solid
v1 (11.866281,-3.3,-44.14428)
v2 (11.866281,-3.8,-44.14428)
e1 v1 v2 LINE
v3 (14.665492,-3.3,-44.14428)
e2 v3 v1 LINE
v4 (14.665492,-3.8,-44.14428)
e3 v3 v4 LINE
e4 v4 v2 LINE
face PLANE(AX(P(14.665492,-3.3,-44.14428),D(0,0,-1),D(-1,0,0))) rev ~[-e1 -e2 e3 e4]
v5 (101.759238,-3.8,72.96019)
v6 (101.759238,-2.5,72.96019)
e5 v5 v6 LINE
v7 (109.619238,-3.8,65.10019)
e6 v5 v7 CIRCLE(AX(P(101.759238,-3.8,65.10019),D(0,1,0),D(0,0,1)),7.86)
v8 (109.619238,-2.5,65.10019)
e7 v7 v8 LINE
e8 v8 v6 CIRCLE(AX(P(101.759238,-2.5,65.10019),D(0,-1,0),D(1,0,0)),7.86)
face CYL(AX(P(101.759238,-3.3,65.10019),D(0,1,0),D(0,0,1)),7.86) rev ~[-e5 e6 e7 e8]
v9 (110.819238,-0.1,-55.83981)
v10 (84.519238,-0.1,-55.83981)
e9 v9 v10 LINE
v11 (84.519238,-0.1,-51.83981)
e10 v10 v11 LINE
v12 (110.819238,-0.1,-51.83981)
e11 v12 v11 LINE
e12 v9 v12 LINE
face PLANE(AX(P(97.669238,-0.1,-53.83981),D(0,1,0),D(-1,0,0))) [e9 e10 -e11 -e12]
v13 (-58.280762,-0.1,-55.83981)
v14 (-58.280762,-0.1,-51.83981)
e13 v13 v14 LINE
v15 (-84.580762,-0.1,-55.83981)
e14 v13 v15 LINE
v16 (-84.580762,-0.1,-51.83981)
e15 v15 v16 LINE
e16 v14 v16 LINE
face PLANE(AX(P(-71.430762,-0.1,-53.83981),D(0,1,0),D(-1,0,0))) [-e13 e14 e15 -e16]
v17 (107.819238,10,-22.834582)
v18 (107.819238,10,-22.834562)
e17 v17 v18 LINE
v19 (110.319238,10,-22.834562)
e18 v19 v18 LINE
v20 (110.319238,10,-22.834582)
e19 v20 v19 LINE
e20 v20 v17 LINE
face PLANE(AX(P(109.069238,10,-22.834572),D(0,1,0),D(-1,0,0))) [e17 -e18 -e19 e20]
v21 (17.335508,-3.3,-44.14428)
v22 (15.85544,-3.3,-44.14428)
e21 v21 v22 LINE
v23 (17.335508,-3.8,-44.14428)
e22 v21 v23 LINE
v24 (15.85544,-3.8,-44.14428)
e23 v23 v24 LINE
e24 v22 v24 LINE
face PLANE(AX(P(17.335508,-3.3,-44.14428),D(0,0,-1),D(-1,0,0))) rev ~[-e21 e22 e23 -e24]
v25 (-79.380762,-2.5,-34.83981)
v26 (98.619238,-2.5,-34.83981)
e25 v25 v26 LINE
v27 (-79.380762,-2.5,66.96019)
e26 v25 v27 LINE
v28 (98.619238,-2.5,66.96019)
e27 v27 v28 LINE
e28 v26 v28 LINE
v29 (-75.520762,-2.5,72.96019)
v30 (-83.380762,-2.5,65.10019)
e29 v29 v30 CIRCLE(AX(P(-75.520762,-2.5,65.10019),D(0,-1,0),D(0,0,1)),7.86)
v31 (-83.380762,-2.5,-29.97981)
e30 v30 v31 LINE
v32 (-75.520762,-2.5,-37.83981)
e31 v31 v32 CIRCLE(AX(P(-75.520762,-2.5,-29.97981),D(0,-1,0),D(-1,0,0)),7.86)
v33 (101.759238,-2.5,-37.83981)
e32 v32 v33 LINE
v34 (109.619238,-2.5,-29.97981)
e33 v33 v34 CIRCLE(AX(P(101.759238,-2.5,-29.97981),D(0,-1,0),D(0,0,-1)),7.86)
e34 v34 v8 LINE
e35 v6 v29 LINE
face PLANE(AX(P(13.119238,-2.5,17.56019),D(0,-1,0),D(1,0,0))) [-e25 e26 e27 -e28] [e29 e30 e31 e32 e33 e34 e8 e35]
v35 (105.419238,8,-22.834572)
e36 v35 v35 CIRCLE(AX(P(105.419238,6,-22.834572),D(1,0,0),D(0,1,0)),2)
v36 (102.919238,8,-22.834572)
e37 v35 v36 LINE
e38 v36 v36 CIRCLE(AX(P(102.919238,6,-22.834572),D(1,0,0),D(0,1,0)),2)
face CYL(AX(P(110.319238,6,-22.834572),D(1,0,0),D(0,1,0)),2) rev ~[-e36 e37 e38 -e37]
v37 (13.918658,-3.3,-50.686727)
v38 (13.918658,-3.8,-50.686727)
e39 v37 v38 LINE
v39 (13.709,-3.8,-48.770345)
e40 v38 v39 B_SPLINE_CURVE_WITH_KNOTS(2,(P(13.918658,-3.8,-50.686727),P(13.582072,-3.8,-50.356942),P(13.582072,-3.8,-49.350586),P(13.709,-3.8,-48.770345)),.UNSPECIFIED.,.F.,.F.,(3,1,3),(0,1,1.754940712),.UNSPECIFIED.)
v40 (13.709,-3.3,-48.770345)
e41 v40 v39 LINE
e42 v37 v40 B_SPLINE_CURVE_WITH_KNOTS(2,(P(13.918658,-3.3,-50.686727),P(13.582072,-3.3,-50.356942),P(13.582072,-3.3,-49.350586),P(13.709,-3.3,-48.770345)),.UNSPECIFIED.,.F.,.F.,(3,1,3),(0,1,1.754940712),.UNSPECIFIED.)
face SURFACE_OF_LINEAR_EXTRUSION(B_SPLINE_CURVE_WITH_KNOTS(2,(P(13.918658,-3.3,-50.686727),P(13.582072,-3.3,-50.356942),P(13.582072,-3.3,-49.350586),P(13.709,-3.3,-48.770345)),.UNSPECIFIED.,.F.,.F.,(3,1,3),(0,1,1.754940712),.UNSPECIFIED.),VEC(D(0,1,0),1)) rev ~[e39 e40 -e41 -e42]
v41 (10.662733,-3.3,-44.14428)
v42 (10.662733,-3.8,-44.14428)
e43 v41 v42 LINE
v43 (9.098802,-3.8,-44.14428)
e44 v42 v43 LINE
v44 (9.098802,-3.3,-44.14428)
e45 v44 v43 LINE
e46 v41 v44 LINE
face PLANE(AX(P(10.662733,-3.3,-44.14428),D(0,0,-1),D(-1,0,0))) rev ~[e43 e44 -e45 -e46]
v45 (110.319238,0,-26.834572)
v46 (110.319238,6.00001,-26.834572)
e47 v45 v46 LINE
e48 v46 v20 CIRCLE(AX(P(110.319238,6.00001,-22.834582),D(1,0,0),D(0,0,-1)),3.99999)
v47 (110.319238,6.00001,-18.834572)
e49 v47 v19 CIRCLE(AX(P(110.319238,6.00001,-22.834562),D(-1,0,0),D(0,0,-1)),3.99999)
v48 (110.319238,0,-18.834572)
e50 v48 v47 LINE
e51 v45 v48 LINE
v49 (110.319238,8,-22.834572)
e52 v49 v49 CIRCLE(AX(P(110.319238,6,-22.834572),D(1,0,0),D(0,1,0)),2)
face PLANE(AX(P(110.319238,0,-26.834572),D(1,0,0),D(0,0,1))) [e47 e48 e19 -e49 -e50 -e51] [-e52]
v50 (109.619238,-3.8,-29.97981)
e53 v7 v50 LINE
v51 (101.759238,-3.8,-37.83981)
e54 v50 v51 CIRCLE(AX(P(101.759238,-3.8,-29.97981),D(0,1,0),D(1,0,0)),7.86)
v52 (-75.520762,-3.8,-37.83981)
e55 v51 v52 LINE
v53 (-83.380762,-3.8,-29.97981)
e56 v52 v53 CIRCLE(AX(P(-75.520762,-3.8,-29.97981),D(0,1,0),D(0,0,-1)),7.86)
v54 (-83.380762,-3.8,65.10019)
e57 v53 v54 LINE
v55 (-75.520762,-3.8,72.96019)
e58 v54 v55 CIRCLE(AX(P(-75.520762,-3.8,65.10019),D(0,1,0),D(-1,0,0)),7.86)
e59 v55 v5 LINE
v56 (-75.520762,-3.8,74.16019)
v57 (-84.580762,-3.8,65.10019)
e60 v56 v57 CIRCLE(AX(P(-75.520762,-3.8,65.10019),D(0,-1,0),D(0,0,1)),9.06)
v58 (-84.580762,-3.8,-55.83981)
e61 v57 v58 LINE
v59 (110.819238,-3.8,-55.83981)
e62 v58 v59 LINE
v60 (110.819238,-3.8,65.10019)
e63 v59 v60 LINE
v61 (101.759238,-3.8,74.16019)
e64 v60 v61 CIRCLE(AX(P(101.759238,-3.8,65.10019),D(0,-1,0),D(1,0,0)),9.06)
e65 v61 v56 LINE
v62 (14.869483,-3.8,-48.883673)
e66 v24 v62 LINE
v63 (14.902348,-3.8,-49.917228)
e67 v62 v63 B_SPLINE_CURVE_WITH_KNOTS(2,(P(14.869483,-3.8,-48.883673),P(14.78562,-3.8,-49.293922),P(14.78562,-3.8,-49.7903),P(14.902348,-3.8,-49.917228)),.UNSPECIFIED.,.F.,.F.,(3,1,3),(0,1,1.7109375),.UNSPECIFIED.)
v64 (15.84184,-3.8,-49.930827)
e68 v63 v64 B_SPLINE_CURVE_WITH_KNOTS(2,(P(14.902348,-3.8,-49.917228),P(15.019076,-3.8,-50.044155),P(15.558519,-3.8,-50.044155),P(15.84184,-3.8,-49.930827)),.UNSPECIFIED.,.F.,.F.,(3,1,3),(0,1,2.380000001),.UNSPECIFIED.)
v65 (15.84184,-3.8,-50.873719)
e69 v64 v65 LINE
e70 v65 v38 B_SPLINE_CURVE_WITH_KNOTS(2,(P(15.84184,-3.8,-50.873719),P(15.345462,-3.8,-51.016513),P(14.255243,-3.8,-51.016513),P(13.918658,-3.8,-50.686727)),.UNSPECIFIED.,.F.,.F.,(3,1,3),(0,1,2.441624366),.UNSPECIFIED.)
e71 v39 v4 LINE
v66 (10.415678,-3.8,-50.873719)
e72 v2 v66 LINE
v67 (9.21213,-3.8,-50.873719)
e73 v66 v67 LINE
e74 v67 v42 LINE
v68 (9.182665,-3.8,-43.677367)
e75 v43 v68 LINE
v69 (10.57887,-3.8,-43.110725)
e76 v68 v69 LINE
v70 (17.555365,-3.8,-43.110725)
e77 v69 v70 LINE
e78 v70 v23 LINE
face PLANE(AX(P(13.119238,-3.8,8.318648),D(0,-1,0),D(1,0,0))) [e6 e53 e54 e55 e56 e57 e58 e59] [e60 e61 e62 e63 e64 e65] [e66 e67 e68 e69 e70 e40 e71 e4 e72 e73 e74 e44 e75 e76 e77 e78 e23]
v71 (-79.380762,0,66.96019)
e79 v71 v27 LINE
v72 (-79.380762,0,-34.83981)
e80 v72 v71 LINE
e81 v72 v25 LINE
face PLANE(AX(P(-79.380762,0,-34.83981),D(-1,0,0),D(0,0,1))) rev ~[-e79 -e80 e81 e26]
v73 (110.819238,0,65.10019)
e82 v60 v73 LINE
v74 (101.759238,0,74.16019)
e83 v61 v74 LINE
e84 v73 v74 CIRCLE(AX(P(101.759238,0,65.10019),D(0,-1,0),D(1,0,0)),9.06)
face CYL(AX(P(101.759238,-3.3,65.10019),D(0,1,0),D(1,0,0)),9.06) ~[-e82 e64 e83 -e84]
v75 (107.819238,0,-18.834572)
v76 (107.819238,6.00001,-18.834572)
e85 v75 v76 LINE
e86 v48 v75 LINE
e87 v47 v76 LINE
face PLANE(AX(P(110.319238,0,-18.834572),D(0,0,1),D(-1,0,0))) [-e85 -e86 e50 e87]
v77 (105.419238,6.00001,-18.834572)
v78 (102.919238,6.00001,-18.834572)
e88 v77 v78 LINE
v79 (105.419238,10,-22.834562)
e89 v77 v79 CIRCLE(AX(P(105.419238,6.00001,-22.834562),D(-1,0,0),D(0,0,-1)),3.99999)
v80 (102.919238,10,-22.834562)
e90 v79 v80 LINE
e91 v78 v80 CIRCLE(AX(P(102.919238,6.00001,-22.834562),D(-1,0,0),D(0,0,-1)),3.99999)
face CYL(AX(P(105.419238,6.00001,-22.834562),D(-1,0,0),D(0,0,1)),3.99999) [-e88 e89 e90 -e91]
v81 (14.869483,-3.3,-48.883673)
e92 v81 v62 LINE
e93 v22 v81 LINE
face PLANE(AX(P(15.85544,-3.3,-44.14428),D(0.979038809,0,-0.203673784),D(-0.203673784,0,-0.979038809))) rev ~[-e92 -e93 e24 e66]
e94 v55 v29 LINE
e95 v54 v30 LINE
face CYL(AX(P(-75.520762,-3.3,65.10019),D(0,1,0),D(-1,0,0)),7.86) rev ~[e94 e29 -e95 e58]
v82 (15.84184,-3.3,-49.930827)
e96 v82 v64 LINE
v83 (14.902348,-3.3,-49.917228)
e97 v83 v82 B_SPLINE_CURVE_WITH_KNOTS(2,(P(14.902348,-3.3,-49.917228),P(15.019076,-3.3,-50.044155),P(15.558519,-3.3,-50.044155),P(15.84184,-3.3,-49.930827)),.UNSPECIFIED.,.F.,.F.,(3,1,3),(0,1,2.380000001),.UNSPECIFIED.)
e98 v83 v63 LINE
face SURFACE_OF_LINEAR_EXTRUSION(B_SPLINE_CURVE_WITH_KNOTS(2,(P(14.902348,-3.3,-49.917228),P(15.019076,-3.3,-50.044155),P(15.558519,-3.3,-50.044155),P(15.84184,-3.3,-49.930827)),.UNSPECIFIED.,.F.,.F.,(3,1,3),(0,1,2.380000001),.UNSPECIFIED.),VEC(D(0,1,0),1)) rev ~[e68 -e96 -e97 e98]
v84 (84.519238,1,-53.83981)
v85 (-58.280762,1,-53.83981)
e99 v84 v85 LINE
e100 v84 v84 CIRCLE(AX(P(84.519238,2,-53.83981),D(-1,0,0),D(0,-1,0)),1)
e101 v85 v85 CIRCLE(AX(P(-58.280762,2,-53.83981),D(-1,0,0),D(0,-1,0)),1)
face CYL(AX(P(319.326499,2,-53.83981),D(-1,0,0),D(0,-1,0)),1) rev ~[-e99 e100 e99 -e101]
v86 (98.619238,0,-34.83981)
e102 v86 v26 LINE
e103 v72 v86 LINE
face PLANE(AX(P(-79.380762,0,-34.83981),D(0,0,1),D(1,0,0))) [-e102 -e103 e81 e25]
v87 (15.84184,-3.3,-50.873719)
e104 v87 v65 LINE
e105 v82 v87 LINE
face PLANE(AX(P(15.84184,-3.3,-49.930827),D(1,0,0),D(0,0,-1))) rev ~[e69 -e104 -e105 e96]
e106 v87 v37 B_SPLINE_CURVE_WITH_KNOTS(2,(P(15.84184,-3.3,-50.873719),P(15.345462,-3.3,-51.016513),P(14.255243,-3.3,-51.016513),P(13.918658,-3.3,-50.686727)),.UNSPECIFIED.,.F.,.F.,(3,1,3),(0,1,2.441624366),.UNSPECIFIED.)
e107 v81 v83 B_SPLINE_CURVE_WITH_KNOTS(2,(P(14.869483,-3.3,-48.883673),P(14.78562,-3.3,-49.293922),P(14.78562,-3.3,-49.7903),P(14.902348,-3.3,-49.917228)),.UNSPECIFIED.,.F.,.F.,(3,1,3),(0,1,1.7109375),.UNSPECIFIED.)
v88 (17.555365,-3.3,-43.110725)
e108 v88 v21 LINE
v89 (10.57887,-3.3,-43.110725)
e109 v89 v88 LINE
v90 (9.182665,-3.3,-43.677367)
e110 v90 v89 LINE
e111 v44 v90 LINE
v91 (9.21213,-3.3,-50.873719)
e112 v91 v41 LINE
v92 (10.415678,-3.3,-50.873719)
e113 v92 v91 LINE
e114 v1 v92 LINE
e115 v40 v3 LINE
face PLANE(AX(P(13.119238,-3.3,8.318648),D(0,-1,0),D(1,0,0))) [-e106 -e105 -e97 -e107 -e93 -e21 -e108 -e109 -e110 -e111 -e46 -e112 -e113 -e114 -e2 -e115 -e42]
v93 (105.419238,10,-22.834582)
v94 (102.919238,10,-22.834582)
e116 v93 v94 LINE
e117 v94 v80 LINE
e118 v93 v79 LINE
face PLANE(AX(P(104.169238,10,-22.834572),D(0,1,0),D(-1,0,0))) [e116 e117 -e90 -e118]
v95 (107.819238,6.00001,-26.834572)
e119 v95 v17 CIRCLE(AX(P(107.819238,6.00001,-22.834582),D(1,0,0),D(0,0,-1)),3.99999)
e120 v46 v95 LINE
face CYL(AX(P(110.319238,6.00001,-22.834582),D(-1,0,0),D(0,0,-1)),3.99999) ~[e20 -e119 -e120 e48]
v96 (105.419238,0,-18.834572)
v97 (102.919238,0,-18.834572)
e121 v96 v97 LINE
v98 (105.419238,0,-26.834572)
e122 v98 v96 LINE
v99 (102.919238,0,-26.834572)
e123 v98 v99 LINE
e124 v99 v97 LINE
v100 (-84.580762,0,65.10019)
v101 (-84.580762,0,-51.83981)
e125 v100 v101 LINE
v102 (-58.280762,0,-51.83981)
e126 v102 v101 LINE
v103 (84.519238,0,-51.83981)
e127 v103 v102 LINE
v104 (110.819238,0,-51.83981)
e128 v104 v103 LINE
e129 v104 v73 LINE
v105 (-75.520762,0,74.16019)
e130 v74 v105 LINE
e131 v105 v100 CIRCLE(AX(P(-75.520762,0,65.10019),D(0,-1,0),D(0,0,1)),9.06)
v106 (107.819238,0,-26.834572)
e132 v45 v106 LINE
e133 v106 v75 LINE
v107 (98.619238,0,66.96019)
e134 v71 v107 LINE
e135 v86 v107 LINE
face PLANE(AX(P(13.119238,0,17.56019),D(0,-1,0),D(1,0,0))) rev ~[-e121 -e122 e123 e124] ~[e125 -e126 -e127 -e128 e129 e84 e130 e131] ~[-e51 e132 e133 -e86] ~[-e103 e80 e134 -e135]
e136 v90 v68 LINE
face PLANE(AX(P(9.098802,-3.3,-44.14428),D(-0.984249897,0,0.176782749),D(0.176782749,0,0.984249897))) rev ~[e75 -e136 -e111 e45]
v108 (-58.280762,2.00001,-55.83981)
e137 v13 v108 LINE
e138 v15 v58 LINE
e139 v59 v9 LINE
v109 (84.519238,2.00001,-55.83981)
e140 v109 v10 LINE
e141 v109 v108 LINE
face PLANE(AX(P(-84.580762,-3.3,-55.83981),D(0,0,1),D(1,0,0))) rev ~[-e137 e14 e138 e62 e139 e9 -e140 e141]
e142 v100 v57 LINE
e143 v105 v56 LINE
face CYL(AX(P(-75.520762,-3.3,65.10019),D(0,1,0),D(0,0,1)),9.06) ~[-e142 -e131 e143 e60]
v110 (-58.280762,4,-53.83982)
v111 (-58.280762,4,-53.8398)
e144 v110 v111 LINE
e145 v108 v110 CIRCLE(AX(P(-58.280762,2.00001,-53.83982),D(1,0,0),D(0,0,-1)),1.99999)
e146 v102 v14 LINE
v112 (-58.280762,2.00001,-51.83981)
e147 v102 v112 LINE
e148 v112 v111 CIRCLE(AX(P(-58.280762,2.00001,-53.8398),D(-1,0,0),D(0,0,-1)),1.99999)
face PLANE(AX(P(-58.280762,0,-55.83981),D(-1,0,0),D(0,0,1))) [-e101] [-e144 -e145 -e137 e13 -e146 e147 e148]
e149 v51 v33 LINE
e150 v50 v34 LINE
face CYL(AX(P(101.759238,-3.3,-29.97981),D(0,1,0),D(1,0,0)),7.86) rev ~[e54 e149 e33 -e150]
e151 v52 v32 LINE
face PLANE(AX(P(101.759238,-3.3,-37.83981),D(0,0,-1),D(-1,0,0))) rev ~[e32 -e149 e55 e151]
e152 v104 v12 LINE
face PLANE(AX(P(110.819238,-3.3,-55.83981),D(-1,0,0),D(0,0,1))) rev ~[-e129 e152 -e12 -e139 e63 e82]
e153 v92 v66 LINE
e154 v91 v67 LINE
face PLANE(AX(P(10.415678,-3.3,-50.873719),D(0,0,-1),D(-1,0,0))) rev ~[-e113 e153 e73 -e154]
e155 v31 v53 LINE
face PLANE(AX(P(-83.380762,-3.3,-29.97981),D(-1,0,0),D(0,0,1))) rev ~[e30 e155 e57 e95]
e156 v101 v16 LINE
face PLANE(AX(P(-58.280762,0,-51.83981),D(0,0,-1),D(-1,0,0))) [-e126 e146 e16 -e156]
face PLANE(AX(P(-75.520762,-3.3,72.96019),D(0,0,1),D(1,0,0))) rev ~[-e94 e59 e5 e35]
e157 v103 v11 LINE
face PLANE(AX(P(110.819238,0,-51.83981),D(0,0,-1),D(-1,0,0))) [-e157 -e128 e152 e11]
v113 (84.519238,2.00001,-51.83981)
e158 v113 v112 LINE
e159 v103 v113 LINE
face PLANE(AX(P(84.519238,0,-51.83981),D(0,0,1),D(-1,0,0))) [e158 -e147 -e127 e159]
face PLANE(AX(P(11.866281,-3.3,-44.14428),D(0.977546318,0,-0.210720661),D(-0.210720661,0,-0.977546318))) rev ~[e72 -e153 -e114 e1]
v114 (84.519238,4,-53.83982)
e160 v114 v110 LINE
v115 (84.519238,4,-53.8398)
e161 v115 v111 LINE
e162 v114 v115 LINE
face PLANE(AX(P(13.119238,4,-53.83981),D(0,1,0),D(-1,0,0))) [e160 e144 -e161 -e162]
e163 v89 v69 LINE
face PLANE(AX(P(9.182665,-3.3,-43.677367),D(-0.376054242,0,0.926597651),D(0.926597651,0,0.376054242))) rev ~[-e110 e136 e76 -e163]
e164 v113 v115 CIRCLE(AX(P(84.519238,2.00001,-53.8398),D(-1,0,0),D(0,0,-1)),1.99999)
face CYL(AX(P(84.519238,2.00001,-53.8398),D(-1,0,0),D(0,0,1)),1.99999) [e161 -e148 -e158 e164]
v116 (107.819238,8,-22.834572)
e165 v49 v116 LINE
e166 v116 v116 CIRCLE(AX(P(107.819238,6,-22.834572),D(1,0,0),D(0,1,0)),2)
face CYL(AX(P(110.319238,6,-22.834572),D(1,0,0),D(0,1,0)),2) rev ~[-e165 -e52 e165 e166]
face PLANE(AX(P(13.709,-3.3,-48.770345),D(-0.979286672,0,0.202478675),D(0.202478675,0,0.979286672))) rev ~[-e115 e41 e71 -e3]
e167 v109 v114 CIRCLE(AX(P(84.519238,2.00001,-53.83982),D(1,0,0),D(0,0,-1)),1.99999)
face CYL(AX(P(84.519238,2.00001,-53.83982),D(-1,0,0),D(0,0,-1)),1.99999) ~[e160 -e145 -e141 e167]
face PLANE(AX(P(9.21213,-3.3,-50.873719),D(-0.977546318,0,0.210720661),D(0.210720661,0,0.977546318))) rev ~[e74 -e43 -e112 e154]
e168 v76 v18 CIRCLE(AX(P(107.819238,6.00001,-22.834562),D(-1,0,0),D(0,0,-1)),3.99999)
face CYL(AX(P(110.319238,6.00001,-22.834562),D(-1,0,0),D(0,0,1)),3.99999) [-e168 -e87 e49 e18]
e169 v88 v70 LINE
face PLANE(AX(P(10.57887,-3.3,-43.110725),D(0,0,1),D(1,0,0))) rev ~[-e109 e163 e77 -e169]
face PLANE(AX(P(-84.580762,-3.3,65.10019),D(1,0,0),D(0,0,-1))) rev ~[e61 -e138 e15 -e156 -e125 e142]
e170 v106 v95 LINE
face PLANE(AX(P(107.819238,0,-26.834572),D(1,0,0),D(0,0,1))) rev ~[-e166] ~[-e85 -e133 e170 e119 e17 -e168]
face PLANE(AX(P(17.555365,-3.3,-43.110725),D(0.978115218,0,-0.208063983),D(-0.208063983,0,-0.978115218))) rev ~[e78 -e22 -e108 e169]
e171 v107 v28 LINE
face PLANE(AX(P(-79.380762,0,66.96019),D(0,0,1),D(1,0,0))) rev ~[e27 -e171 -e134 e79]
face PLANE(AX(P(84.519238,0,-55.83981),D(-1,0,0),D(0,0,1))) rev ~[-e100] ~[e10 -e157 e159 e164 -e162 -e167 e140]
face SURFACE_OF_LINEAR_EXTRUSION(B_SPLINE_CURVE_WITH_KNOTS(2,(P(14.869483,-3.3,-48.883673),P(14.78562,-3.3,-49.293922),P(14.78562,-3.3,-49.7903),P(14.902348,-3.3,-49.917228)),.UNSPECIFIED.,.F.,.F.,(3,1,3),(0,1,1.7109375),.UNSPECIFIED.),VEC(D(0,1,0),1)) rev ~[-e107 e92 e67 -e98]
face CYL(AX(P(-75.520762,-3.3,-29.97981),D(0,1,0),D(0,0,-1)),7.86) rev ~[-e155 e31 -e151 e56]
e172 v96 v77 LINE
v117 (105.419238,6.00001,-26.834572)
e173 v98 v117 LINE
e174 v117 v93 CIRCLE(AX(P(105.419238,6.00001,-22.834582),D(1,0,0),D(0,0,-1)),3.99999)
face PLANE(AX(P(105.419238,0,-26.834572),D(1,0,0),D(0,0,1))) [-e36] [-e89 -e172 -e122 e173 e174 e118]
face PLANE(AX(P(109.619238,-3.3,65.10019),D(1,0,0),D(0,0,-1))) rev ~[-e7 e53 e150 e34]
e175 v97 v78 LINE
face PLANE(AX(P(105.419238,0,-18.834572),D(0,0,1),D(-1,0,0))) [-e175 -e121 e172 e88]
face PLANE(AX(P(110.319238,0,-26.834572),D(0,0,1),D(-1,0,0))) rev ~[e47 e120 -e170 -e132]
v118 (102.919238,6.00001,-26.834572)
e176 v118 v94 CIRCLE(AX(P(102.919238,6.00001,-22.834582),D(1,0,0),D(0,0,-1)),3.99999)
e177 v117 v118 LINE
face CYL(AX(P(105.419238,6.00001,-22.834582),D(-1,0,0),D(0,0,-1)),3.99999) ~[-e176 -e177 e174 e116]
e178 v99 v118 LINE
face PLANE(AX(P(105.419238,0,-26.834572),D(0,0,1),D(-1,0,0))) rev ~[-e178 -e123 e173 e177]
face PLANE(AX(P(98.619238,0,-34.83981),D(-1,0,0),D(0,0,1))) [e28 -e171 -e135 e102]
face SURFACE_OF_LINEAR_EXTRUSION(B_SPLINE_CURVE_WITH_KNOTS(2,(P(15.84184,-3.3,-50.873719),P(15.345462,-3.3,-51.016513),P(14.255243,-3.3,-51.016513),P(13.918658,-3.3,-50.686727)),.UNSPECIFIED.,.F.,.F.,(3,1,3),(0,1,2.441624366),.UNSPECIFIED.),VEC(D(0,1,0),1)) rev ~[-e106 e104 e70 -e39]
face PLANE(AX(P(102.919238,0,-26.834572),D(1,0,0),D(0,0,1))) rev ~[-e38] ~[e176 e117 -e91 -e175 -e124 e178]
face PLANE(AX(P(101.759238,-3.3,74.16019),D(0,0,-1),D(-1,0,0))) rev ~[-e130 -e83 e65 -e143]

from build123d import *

# Parameters (mm, degrees)
F1_DEPTH  = 3.3
F0_W      = 178
F0_H      = 101.8
F2_DEPTH  = 2.5
F3_W      = 142.8
F3_H      = 4
F4_DEPTH  = 4
F5_R      = 1.99999
F7_D      = 2
F3_W_2    = 26.3
F8_DEPTH  = 0.1
F10_DEPTH = 0.5
F3_W_3    = 2.5
F3_H_2    = 8
F11_DEPTH = 10
F12_R     = 3.99999
F13_R     = 2
F14_DEPTH = 10


# Not quite as in the source:
# - a fillet or chamfer is up to 0.001 mm smaller than in the source, because OpenCascade refuses the exact size


with BuildPart() as f1:
    # F0 (on Front) → F1 (new body)
    with BuildSketch(Plane.XZ):
        with BuildLine():
            ThreePointArc((-75.5207621713, 74.1601898761), (-81.9271496089, 71.5065773137), (-84.5807621713, 65.1001898761))
            Line((-84.5807621713, 65.1001898761), (-84.5807621713, -35.3734344864))
            Line((-84.5807621713, -35.3734344864), (-84.5807621713, -55.8398101239))
            Line((-84.5807621713, -55.8398101239), (110.8192378287, -55.8398101239))
            Line((110.8192378287, -55.8398101239), (110.8192378287, -35.3734344864))
            Line((110.8192378287, -35.3734344864), (110.8192378287, 65.1001898761))
            ThreePointArc((110.8192378287, 65.1001898761), (108.1656252662, 71.5065773137), (101.7592378287, 74.1601898761))
            Line((101.7592378287, 74.1601898761), (-75.5207621713, 74.1601898761))
        make_face()
        with BuildLine():
            ThreePointArc((-83.3807621713, 65.1001898761), (-81.0786214714, 70.6580491763), (-75.5207621713, 72.9601898761))
            Line((-75.5207621713, 72.9601898761), (101.7592378287, 72.9601898761))
            ThreePointArc((101.7592378287, 72.9601898761), (107.3170971288, 70.6580491763), (109.6192378287, 65.1001898761))
            Line((109.6192378287, 65.1001898761), (109.6192378287, -29.9798101239))
            ThreePointArc((109.6192378287, -29.9798101239), (107.3170971288, -35.537669424), (101.7592378287, -37.8398101239))
            Line((101.7592378287, -37.8398101239), (-75.5207621713, -37.8398101239))
            ThreePointArc((-75.5207621713, -37.8398101239), (-81.0786214714, -35.537669424), (-83.3807621713, -29.9798101239))
            Line((-83.3807621713, -29.9798101239), (-83.3807621713, 65.1001898761))
        make_face(mode=Mode.SUBTRACT)
    extrude(amount=F1_DEPTH)

    # F0 (on Front) → F2 (join)
    with BuildSketch(Plane.XZ):
        with BuildLine():
            Line((101.7592378287, 72.9601898761), (-75.5207621713, 72.9601898761))
            ThreePointArc((-75.5207621713, 72.9601898761), (-81.0786214714, 70.6580491763), (-83.3807621713, 65.1001898761))
            Line((-83.3807621713, 65.1001898761), (-83.3807621713, -29.9798101239))
            ThreePointArc((-83.3807621713, -29.9798101239), (-81.0786214714, -35.537669424), (-75.5207621713, -37.8398101239))
            Line((-75.5207621713, -37.8398101239), (101.7592378287, -37.8398101239))
            ThreePointArc((101.7592378287, -37.8398101239), (107.3170971288, -35.537669424), (109.6192378287, -29.9798101239))
            Line((109.6192378287, -29.9798101239), (109.6192378287, 65.1001898761))
            ThreePointArc((109.6192378287, 65.1001898761), (107.3170971288, 70.6580491763), (101.7592378287, 72.9601898761))
        make_face()
        with Locations((9.6192378287, 16.0601898761)):
            Rectangle(F0_W, F0_H, mode=Mode.SUBTRACT)
    extrude(amount=F2_DEPTH)

    # F3 (on face) → F4 (join)
    with BuildSketch(Plane(origin=(0, 0, 0), x_dir=(-1, 0, 0), z_dir=(0, 1, 0))):
        with Locations((-13.1192378287, -53.8398101239)):
            Rectangle(F3_W, F3_H)
    extrude(amount=F4_DEPTH)

    # F5 (radius 2 in the source; OpenCascade refuses exactly that, so slightly less here)
    f5_edges = [f1.edges().sort_by_distance(p)[0] for p in [
        (13.119238, 4, -51.83981),
        (13.119238, 4, -55.83981),
    ]]
    fillet(f5_edges, radius=F5_R)

    # F7 (through all)
    with Locations(Plane.YZ.offset(84.5192378287)):
        with Locations((2, -53.8398101239)):
            Hole(F7_D / 2)

    # F3 (on face) → F8 (cut)
    with BuildSketch(Plane(origin=(0, 0, 0), x_dir=(-1, 0, 0), z_dir=(0, 1, 0))):
        with Locations((-97.6692378287, -53.8398101239)):
            Rectangle(F3_W_2, F3_H)
        with Locations((71.4307621713, -53.8398101239)):
            Rectangle(F3_W_2, F3_H)
    extrude(amount=-F8_DEPTH, mode=Mode.SUBTRACT)

    # F9 (on face) → F10 (join)
    with BuildSketch(Plane.XZ.offset(3.3)):
        with BuildLine():
            Line((101.7592378287, 74.1601898761), (-75.5207621713, 74.1601898761))
            ThreePointArc((-75.5207621713, 74.1601898761), (-81.9271496089, 71.5065773137), (-84.5807621713, 65.1001898761))
            Line((-84.5807621713, 65.1001898761), (-84.5807621713, -55.8398101239))
            Line((-84.5807621713, -55.8398101239), (110.8192378287, -55.8398101239))
            Line((110.8192378287, -55.8398101239), (110.8192378287, 65.1001898761))
            ThreePointArc((110.8192378287, 65.1001898761), (108.1656252662, 71.5065773137), (101.7592378287, 74.1601898761))
        make_face()
        with BuildLine():
            add(Edge.make_bspline(
                [(14.902347951, -49.9172276662), (15.0190761779, -50.0441554468), (15.2457329289, -50.0441554468)],
                knots=[0, 0, 0, 1, 1, 1], degree=2))
            add(Edge.make_bspline(
                [(15.2457329289, -50.0441554468), (15.5585192454, -50.0441554468), (15.8418401843, -49.9308270713)],
                knots=[0, 0, 0, 1, 1, 1], degree=2))
            Line((15.8418401843, -49.9308270713), (15.8418401843, -50.8737191558))
            add(Edge.make_bspline(
                [(15.8418401843, -50.8737191558), (15.3454618994, -51.016512909), (14.8989480998, -51.016512909)],
                knots=[0, 0, 0, 1, 1, 1], degree=2))
            add(Edge.make_bspline(
                [(14.8989480998, -51.016512909), (14.2552429267, -51.016512909), (13.9186576513, -50.6867273361)],
                knots=[0, 0, 0, 1, 1, 1], degree=2))
            add(Edge.make_bspline(
                [(13.9186576513, -50.6867273361), (13.582072376, -50.3569417633), (13.582072376, -49.7835001831)],
                knots=[0, 0, 0, 1, 1, 1], degree=2))
            add(Edge.make_bspline(
                [(13.582072376, -49.7835001831), (13.582072376, -49.3505857885), (13.7090001566, -48.7703445057)],
                knots=[0, 0, 0, 1, 1, 1], degree=2))
            Line((13.7090001566, -48.7703445057), (14.6654916462, -44.144280216))
            Line((14.6654916462, -44.144280216), (11.8662807702, -44.144280216))
            Line((11.8662807702, -44.144280216), (10.4156775633, -50.8737191558))
            Line((10.4156775633, -50.8737191558), (9.212130215, -50.8737191558))
            Line((9.212130215, -50.8737191558), (10.662733422, -44.144280216))
            Line((10.662733422, -44.144280216), (9.0988018395, -44.144280216))
            Line((9.0988018395, -44.144280216), (9.1826648374, -43.6773673088))
            Line((9.1826648374, -43.6773673088), (10.5788704241, -43.1107254311))
            Line((10.5788704241, -43.1107254311), (17.5553652225, -43.1107254311))
            Line((17.5553652225, -43.1107254311), (17.335508174, -44.144280216))
            Line((17.335508174, -44.144280216), (15.8554395894, -44.144280216))
            Line((15.8554395894, -44.144280216), (14.8694827221, -48.8836728813))
            add(Edge.make_bspline(
                [(14.8694827221, -48.8836728813), (14.7856197242, -49.2939216007), (14.7856197242, -49.5840422421)],
                knots=[0, 0, 0, 1, 1, 1], degree=2))
            add(Edge.make_bspline(
                [(14.7856197242, -49.5840422421), (14.7856197242, -49.7902998856), (14.902347951, -49.9172276662)],
                knots=[0, 0, 0, 1, 1, 1], degree=2))
        make_face(mode=Mode.SUBTRACT)
        with BuildLine():
            Line((-83.3807621713, -29.9798101239), (-83.3807621713, 65.1001898761))
            ThreePointArc((-83.3807621713, 65.1001898761), (-81.0786214714, 70.6580491763), (-75.5207621713, 72.9601898761))
            Line((-75.5207621713, 72.9601898761), (101.7592378287, 72.9601898761))
            ThreePointArc((101.7592378287, 72.9601898761), (107.3170971288, 70.6580491763), (109.6192378287, 65.1001898761))
            Line((109.6192378287, 65.1001898761), (109.6192378287, -29.9798101239))
            ThreePointArc((109.6192378287, -29.9798101239), (107.3170971288, -35.537669424), (101.7592378287, -37.8398101239))
            Line((101.7592378287, -37.8398101239), (-75.5207621713, -37.8398101239))
            ThreePointArc((-75.5207621713, -37.8398101239), (-81.0786214714, -35.537669424), (-83.3807621713, -29.9798101239))
        make_face(mode=Mode.SUBTRACT)
    extrude(amount=F10_DEPTH)

    # F3 (on face) → F11 (join)
    with BuildSketch(Plane(origin=(0, 0, 0), x_dir=(-1, 0, 0), z_dir=(0, 1, 0))):
        with Locations((-109.0692378287, -22.8345717341)):
            Rectangle(F3_W_3, F3_H_2)
        with Locations((-104.1692378287, -22.8345717341)):
            Rectangle(F3_W_3, F3_H_2)
    extrude(amount=F11_DEPTH)

    # F12 (radius 4 in the source; OpenCascade refuses exactly that, so slightly less here)
    f12_edges = [f1.edges().sort_by_distance(p)[0] for p in [
        (109.069238, 10, -18.834572),
        (109.069238, 10, -26.834572),
        (104.169238, 10, -18.834572),
        (104.169238, 10, -26.834572),
    ]]
    fillet(f12_edges, radius=F12_R)

    # F13 (on face) → F14 (cut)
    with BuildSketch(Plane.YZ.offset(110.3192378287)):
        with Locations((6, -22.8345717341)):
            Circle(F13_R)
    extrude(amount=-F14_DEPTH, mode=Mode.SUBTRACT)


solid = f1.part
